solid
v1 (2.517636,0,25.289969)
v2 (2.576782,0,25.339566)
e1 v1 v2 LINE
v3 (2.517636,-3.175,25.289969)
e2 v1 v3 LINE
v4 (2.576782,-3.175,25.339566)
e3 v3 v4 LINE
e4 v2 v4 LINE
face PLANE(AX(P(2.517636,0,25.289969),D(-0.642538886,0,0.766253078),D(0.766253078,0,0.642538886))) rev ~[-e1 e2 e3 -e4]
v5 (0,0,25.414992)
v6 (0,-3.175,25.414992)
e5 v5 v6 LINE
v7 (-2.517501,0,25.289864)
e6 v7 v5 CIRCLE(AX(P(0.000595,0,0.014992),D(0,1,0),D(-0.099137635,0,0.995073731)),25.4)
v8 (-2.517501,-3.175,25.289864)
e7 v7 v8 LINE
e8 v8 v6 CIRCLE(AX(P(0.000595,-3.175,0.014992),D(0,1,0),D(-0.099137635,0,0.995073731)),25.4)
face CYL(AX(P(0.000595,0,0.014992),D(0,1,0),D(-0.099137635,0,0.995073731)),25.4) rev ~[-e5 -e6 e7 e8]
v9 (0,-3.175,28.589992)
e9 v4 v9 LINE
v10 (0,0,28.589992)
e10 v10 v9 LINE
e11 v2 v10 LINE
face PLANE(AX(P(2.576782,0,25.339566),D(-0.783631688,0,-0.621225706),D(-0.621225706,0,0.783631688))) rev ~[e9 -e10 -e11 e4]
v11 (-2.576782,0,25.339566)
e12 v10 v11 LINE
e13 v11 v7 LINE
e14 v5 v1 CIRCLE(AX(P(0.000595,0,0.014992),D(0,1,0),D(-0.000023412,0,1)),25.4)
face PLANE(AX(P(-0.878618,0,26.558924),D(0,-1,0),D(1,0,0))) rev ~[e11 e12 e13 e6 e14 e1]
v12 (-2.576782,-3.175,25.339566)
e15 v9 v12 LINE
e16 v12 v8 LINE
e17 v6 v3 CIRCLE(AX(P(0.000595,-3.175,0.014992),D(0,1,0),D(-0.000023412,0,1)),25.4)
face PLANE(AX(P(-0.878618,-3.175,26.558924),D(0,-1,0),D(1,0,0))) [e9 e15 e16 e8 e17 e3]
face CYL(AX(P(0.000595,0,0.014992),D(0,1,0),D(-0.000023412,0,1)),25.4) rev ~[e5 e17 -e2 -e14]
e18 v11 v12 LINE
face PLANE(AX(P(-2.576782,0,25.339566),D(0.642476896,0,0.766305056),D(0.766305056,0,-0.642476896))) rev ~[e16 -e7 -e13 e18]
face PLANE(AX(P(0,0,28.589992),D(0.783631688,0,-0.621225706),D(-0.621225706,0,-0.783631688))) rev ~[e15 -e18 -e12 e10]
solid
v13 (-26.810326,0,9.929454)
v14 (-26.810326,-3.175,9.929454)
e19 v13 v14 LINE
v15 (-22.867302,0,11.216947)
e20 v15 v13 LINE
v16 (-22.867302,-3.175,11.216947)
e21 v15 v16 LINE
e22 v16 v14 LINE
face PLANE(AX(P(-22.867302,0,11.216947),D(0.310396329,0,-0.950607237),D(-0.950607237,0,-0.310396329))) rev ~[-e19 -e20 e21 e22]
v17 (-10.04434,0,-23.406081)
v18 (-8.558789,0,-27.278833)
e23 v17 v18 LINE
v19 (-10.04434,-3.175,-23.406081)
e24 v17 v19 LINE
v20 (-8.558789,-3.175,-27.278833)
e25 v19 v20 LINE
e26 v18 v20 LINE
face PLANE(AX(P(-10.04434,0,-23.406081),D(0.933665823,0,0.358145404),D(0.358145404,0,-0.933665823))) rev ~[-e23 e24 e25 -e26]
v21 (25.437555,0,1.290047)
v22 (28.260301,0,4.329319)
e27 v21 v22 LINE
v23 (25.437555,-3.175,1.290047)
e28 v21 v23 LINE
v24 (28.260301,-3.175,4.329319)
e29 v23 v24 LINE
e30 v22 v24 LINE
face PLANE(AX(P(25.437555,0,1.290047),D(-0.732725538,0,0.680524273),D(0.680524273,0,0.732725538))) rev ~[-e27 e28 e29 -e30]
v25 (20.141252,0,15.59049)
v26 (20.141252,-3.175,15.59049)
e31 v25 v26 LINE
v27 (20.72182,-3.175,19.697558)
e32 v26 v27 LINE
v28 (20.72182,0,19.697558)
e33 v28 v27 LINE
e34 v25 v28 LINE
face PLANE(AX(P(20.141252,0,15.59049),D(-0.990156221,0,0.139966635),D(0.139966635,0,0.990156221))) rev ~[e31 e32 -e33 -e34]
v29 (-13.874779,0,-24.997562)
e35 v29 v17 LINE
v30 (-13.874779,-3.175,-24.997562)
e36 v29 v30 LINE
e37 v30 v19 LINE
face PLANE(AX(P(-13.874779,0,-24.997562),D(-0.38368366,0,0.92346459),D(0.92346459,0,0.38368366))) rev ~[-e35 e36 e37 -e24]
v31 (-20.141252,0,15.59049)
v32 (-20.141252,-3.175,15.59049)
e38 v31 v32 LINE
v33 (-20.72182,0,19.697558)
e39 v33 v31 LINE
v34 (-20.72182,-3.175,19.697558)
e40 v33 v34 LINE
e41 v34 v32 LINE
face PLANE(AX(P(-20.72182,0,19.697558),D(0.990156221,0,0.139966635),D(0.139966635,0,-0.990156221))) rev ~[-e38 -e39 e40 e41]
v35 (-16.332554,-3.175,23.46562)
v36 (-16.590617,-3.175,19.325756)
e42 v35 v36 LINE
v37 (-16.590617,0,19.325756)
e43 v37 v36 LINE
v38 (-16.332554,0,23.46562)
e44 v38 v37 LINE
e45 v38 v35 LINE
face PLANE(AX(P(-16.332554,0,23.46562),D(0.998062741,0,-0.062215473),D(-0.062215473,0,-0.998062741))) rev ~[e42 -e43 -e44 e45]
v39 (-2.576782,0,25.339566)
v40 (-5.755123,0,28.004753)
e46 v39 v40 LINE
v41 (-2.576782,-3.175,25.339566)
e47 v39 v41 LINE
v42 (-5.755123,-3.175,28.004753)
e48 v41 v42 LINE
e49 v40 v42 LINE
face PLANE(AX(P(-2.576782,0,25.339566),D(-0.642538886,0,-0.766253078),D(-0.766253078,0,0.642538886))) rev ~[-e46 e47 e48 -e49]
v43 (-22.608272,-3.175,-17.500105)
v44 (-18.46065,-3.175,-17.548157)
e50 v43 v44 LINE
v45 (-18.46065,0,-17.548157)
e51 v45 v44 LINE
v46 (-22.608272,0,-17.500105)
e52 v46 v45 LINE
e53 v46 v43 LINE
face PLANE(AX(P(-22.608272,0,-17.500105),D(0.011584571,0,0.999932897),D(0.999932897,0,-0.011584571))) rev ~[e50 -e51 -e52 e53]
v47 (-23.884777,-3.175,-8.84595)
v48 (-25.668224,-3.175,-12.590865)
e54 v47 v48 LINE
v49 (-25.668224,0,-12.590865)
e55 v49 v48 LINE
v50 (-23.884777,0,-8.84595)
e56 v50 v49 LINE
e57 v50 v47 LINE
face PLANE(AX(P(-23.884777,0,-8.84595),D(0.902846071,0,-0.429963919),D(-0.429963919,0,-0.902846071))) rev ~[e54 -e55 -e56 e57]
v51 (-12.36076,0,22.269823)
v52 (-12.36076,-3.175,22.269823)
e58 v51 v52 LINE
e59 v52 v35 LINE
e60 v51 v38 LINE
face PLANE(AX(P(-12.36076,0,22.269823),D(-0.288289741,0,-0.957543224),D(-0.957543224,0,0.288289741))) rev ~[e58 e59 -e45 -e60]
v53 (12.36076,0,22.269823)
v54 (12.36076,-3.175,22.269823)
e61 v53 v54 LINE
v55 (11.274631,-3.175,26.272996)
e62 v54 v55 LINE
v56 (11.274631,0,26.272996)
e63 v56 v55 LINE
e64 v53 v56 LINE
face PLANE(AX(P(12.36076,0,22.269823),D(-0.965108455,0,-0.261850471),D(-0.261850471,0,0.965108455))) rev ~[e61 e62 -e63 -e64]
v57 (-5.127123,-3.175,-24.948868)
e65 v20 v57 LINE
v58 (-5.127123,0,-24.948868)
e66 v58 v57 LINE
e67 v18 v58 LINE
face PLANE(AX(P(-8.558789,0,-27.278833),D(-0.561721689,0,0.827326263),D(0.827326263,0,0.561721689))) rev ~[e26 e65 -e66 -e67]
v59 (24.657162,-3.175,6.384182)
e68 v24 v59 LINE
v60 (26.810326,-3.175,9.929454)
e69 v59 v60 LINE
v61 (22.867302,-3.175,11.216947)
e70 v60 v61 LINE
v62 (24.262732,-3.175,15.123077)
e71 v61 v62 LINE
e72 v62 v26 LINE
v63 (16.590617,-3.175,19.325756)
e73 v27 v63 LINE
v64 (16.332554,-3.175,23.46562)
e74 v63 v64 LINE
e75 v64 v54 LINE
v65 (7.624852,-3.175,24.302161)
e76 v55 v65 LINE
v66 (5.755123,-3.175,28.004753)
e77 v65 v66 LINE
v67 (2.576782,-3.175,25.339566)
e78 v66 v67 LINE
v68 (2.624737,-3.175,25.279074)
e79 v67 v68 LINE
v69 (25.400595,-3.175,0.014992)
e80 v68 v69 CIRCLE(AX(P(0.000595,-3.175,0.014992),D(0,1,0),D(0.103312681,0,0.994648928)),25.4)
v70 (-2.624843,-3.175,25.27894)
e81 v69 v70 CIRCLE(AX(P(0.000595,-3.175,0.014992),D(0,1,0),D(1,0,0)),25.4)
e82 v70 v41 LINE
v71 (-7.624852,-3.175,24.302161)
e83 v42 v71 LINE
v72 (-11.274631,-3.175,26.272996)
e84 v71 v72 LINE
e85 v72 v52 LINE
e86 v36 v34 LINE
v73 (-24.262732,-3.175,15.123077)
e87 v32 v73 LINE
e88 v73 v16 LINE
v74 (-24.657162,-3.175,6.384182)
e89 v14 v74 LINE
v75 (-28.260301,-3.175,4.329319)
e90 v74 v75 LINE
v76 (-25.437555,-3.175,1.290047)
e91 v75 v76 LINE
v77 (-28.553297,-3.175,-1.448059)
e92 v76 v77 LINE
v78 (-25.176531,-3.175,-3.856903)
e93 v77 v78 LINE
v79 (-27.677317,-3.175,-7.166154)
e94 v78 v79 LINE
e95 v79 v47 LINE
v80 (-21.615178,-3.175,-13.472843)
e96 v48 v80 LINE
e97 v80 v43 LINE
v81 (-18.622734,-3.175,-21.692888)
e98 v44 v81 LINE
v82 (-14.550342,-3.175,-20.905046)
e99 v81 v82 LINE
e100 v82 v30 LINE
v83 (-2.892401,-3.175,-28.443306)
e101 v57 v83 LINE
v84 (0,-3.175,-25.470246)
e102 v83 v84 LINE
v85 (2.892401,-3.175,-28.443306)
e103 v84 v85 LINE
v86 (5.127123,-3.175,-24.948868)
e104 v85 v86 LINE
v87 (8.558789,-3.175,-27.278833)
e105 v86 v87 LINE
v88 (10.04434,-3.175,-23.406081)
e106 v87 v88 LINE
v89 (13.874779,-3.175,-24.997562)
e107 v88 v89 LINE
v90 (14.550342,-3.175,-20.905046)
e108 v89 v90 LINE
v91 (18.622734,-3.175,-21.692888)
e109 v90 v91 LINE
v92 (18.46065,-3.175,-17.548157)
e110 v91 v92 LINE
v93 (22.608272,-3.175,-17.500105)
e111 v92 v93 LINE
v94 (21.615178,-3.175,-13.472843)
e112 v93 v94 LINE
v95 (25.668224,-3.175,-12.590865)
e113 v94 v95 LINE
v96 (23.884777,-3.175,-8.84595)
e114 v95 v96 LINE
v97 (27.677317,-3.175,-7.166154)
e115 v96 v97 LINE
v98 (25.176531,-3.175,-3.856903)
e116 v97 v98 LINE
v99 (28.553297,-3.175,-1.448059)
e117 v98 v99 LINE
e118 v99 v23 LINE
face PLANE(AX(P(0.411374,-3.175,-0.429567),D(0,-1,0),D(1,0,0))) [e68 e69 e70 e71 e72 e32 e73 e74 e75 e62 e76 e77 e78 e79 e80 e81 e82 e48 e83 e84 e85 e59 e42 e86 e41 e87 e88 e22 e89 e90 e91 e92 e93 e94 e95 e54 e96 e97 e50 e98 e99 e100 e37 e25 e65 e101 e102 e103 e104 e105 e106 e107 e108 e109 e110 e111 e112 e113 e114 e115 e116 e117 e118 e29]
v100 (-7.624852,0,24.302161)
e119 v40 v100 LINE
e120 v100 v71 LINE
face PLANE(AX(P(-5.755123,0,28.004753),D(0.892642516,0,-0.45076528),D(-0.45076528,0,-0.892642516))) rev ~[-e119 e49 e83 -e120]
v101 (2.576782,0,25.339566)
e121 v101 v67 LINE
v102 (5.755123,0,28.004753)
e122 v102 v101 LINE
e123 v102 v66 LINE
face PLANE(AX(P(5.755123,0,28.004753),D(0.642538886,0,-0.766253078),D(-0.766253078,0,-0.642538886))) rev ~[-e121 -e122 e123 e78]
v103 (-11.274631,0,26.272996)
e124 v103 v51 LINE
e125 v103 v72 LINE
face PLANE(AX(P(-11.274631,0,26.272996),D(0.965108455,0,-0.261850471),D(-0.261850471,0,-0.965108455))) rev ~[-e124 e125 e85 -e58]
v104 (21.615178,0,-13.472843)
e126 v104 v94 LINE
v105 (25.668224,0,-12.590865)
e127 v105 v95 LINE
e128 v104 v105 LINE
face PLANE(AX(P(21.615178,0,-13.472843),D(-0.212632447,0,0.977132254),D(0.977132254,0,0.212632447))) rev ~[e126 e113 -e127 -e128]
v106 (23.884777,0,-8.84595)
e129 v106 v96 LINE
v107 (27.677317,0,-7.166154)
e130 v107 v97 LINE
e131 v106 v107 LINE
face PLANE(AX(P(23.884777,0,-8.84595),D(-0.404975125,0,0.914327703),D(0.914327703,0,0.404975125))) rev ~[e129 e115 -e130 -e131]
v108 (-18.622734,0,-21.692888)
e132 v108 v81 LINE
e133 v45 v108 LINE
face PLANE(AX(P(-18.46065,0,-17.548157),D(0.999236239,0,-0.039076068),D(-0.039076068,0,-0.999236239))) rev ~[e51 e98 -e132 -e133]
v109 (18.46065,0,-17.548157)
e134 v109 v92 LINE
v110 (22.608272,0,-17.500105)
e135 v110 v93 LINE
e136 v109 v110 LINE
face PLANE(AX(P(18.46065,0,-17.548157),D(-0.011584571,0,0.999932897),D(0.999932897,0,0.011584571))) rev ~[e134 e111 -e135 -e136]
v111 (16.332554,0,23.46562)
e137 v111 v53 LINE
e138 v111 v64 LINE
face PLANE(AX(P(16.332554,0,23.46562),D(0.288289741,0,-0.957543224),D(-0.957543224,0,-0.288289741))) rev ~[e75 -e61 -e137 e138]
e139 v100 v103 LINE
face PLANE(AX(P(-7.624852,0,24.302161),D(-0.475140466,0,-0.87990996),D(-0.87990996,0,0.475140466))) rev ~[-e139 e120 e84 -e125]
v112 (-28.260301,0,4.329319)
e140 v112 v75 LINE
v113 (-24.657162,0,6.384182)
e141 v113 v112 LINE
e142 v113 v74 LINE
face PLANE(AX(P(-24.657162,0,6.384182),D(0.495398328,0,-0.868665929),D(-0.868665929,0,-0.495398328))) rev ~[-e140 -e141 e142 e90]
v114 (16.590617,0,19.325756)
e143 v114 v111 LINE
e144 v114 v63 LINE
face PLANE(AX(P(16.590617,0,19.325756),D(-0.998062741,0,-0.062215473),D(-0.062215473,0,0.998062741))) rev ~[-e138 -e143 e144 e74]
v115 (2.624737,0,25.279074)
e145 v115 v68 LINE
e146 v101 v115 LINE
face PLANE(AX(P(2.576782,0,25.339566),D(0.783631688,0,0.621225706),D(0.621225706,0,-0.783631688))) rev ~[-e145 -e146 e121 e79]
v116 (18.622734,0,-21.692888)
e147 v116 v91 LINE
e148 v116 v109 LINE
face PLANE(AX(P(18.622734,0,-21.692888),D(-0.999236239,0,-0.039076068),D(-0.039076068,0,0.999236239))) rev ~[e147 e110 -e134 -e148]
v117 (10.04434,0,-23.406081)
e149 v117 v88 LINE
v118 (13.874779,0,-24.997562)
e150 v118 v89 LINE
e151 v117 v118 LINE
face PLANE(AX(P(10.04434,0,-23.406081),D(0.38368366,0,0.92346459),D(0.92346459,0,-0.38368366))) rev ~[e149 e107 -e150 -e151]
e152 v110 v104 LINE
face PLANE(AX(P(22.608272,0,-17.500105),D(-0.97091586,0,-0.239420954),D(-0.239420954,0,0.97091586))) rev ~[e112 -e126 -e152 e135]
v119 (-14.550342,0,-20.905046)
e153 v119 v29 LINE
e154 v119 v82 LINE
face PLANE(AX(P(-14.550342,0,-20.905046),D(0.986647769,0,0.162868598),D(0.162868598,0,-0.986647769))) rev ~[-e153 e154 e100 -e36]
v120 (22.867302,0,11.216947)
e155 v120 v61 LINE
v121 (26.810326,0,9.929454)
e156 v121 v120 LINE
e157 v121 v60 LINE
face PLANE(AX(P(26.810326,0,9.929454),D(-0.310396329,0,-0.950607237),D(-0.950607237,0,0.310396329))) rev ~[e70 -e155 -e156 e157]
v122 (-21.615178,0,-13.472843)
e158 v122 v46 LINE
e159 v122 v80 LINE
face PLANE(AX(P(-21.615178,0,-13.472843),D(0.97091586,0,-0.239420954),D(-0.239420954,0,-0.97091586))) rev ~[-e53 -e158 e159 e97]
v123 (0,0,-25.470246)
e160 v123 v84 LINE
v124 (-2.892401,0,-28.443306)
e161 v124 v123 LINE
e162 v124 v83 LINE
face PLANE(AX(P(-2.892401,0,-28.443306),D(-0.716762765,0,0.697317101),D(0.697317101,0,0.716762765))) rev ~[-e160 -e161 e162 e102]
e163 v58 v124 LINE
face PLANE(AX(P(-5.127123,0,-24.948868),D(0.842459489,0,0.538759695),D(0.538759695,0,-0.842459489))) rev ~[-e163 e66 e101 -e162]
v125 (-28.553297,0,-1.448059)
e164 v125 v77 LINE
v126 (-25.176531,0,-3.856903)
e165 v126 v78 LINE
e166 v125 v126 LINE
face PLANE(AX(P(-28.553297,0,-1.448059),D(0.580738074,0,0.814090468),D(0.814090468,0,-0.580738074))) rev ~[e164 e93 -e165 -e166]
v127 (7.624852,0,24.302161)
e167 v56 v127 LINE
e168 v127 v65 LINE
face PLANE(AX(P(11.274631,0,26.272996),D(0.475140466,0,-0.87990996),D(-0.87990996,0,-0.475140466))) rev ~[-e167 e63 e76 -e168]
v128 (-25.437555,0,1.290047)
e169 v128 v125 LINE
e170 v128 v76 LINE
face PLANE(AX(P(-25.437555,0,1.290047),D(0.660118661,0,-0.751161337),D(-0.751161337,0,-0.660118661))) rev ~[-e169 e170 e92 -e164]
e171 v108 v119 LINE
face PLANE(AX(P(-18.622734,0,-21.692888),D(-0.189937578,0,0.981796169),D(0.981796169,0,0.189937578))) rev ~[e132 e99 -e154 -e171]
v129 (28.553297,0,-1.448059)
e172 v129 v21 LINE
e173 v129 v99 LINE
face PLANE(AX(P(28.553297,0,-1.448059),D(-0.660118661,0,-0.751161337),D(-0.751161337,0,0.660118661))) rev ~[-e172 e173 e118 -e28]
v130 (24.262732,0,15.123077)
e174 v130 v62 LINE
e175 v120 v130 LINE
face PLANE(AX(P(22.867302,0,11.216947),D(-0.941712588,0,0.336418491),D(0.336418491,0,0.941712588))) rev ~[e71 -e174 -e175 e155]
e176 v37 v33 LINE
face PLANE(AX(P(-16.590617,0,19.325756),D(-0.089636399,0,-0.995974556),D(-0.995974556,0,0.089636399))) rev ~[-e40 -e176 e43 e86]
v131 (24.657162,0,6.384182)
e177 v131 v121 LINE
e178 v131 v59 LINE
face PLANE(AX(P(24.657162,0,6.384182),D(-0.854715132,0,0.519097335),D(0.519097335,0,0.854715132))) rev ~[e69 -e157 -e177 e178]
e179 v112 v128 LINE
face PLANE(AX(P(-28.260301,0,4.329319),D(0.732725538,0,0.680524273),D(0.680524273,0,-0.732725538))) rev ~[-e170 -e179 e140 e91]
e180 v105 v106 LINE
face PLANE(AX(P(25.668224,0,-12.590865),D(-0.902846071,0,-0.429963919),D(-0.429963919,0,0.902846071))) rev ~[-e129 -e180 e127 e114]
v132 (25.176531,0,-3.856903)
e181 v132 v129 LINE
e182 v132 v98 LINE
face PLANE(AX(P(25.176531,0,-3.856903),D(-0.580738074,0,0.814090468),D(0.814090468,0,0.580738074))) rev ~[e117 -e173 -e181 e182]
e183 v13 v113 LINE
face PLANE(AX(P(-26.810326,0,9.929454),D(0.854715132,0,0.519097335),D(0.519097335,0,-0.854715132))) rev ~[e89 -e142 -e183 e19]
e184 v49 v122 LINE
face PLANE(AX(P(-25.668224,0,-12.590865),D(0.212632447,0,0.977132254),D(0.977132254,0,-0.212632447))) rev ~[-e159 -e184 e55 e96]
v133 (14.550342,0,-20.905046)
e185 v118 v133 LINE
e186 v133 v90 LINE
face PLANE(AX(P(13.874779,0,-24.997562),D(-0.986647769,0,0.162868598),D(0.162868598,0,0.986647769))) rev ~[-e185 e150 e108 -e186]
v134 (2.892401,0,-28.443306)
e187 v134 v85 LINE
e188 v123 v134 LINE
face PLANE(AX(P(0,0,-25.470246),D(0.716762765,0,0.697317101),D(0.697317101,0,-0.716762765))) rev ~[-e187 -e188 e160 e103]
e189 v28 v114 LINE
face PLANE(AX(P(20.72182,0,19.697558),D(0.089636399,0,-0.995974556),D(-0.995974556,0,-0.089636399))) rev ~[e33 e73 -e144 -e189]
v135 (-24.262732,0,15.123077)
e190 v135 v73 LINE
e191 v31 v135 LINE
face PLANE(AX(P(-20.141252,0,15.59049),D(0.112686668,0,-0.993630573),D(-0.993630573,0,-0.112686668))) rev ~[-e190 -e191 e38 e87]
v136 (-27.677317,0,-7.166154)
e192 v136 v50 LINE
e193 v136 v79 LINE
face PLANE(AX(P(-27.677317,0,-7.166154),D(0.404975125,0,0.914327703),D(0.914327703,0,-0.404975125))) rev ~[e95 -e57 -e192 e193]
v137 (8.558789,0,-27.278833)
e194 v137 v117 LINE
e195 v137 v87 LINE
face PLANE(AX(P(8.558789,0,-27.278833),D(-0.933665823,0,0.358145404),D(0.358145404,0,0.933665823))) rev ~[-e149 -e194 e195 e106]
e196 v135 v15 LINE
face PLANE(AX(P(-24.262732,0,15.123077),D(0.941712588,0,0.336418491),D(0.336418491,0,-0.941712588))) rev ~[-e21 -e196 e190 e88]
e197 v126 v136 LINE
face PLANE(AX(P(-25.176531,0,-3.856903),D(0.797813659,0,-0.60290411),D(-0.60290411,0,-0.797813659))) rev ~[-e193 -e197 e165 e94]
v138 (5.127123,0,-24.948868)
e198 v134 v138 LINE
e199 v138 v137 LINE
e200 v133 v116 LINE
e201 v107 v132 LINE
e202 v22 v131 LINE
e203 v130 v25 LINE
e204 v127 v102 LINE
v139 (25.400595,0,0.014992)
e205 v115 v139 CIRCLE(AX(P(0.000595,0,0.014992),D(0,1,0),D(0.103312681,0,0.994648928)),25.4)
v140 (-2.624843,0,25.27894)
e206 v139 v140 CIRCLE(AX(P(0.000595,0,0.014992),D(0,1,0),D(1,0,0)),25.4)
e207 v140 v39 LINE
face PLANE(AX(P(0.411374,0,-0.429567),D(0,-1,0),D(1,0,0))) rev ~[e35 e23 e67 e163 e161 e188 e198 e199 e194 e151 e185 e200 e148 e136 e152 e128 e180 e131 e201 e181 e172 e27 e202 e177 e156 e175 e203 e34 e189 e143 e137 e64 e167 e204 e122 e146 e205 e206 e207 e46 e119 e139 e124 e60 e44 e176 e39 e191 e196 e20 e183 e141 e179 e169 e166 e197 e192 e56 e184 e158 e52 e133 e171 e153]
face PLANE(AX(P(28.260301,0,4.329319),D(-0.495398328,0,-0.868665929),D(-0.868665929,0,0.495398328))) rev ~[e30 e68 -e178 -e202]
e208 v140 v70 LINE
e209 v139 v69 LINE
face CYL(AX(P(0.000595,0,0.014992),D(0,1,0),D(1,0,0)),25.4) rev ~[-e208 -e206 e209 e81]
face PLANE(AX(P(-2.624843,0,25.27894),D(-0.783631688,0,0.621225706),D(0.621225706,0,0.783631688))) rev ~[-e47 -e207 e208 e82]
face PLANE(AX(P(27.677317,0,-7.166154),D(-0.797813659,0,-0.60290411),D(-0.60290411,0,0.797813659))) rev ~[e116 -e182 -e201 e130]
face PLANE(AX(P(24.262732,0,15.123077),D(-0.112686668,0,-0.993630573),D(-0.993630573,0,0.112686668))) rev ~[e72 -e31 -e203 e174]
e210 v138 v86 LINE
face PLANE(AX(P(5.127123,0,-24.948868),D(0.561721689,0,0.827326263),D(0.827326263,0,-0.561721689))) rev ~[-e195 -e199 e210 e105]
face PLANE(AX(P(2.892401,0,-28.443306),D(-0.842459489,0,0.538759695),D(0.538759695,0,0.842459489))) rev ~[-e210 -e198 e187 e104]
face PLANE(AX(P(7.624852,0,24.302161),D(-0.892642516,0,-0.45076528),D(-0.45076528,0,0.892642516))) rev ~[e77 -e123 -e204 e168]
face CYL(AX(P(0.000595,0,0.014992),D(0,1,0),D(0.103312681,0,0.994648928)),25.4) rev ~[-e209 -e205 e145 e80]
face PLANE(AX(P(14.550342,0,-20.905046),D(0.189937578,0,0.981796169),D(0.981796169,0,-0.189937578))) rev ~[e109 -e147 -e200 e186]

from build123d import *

# Parameters (mm, degrees)
F1_DEPTH = 3.175


# Not quite as in the source:
# - ends of sketch curves that miss each other by under 0.0002 mm in the source are joined


with BuildPart() as f1:
    # F0 (on Front) → F1 (new body)
    with BuildSketch(Plane.XZ):
        with BuildLine():
            ThreePointArc((-2.5175012698, 25.2898644656), (-1.2603037412, 25.3836758526), (0, 25.4149917008))
            Line((0, 25.4149917008), (0, 28.5899917008))
            Line((0, 28.5899917008), (-2.5767820025, 25.3395659531))
            Line((-2.5767820025, 25.3395659531), (-2.5175012698, 25.2898644656))
        make_face()
        with BuildLine():
            Line((0, 28.5899917008), (0, 25.4149917008))
            ThreePointArc((0, 25.4149917008), (1.2603700069, 25.3837316461), (2.5176362485, 25.2899694843))
            Line((2.5176362485, 25.2899694843), (2.5767820025, 25.3395659531))
            Line((2.5767820025, 25.3395659531), (0, 28.5899917008))
        make_face()
    extrude(amount=F1_DEPTH)


with BuildPart() as f1b:
    # F0 (on Front) → F1, piece 2 (new body)
    with BuildSketch(Plane.XZ):
        with BuildLine():
            ThreePointArc((25.400594653, 0.0149917078), (-17.0063726111, -18.850931659), (-2.624843495, 25.2789398262))
            Line((-2.624843495, 25.2789398262), (-2.5767820025, 25.3395659531))
            Line((-2.5767820025, 25.3395659531), (-5.7551230187, 28.0047528911))
            Line((-5.7551230187, 28.0047528911), (-7.6248522496, 24.3021611457))
            Line((-7.6248522496, 24.3021611457), (-11.2746306249, 26.2729962076))
            Line((-11.2746306249, 26.2729962076), (-12.3607601497, 22.2698230056))
            Line((-12.3607601497, 22.2698230056), (-16.3325535285, 23.4656199724))
            Line((-16.3325535285, 23.4656199724), (-16.5906170769, 19.3257556951))
            Line((-16.5906170769, 19.3257556951), (-20.7218197717, 19.6975584985))
            Line((-20.7218197717, 19.6975584985), (-20.1412521917, 15.5904896757))
            Line((-20.1412521917, 15.5904896757), (-24.2627322787, 15.1230766653))
            Line((-24.2627322787, 15.1230766653), (-22.8673020753, 11.2169471773))
            Line((-22.8673020753, 11.2169471773), (-26.8103256755, 9.9294542965))
            Line((-26.8103256755, 9.9294542965), (-24.6571619251, 6.3841815434))
            Line((-24.6571619251, 6.3841815434), (-28.260301189, 4.3293189021))
            Line((-28.260301189, 4.3293189021), (-25.4375546686, 1.290046767))
            Line((-25.4375546686, 1.290046767), (-28.5532966515, -1.4480593168))
            Line((-28.5532966515, -1.4480593168), (-25.1765309352, -3.8569026755))
            Line((-25.1765309352, -3.8569026755), (-27.6773167941, -7.1661538171))
            Line((-27.6773167941, -7.1661538171), (-23.8847770672, -8.8459500694))
            Line((-23.8847770672, -8.8459500694), (-25.6682243353, -12.5908651381))
            Line((-25.6682243353, -12.5908651381), (-21.6151776197, -13.4728432281))
            Line((-21.6151776197, -13.4728432281), (-22.6082717562, -17.500104961))
            Line((-22.6082717562, -17.500104961), (-18.4606502608, -17.548156602))
            Line((-18.4606502608, -17.548156602), (-18.6227338752, -21.6928884307))
            Line((-18.6227338752, -21.6928884307), (-14.5503417112, -20.9050463828))
            Line((-14.5503417112, -20.9050463828), (-13.8747790811, -24.9975624992))
            Line((-13.8747790811, -24.9975624992), (-10.0443404623, -23.4060811085))
            Line((-10.0443404623, -23.4060811085), (-8.5587892013, -27.2788334219))
            Line((-8.5587892013, -27.2788334219), (-5.1271227347, -24.9488681235))
            Line((-5.1271227347, -24.9488681235), (-2.892401486, -28.4433056992))
            Line((-2.892401486, -28.4433056992), (0, -25.4702455461))
            Line((0, -25.4702455461), (2.892401486, -28.4433056992))
            Line((2.892401486, -28.4433056992), (5.1271227347, -24.9488681235))
            Line((5.1271227347, -24.9488681235), (8.5587892013, -27.2788334219))
            Line((8.5587892013, -27.2788334219), (10.0443404623, -23.4060811085))
            Line((10.0443404623, -23.4060811085), (13.8747790811, -24.9975624992))
            Line((13.8747790811, -24.9975624992), (14.5503417112, -20.9050463828))
            Line((14.5503417112, -20.9050463828), (18.6227338752, -21.6928884307))
            Line((18.6227338752, -21.6928884307), (18.4606502608, -17.548156602))
            Line((18.4606502608, -17.548156602), (22.6082717562, -17.500104961))
            Line((22.6082717562, -17.500104961), (21.6151776197, -13.4728432281))
            Line((21.6151776197, -13.4728432281), (25.6682243353, -12.5908651381))
            Line((25.6682243353, -12.5908651381), (23.8847770672, -8.8459500694))
            Line((23.8847770672, -8.8459500694), (27.6773167941, -7.1661538171))
            Line((27.6773167941, -7.1661538171), (25.1765309352, -3.8569026755))
            Line((25.1765309352, -3.8569026755), (28.5532966515, -1.4480593168))
            Line((28.5532966515, -1.4480593168), (25.4375546686, 1.290046767))
            Line((25.4375546686, 1.290046767), (28.260301189, 4.3293189021))
            Line((28.260301189, 4.3293189021), (24.6571619251, 6.3841815434))
            Line((24.6571619251, 6.3841815434), (26.8103256755, 9.9294542965))
            Line((26.8103256755, 9.9294542965), (22.8673020753, 11.2169471773))
            Line((22.8673020753, 11.2169471773), (24.2627322787, 15.1230766653))
            Line((24.2627322787, 15.1230766653), (20.1412521917, 15.5904896757))
            Line((20.1412521917, 15.5904896757), (20.7218197717, 19.6975584985))
            Line((20.7218197717, 19.6975584985), (16.5906170769, 19.3257556951))
            Line((16.5906170769, 19.3257556951), (16.3325535285, 23.4656199724))
            Line((16.3325535285, 23.4656199724), (12.3607601497, 22.2698230056))
            Line((12.3607601497, 22.2698230056), (11.2746306249, 26.2729962076))
            Line((11.2746306249, 26.2729962076), (7.6248522496, 24.3021611457))
            Line((7.6248522496, 24.3021611457), (5.7551230187, 28.0047528911))
            Line((5.7551230187, 28.0047528911), (2.5767820025, 25.3395659531))
            Line((2.5767820025, 25.3395659531), (2.6247367489, 25.2790744788))
            ThreePointArc((2.6247367489, 25.2790744788), (18.8660817821, 17.0224428802), (25.400594653, 0.0149917078))
        make_face()
    extrude(amount=F1_DEPTH)


solid = Compound([f1.part, f1b.part])
